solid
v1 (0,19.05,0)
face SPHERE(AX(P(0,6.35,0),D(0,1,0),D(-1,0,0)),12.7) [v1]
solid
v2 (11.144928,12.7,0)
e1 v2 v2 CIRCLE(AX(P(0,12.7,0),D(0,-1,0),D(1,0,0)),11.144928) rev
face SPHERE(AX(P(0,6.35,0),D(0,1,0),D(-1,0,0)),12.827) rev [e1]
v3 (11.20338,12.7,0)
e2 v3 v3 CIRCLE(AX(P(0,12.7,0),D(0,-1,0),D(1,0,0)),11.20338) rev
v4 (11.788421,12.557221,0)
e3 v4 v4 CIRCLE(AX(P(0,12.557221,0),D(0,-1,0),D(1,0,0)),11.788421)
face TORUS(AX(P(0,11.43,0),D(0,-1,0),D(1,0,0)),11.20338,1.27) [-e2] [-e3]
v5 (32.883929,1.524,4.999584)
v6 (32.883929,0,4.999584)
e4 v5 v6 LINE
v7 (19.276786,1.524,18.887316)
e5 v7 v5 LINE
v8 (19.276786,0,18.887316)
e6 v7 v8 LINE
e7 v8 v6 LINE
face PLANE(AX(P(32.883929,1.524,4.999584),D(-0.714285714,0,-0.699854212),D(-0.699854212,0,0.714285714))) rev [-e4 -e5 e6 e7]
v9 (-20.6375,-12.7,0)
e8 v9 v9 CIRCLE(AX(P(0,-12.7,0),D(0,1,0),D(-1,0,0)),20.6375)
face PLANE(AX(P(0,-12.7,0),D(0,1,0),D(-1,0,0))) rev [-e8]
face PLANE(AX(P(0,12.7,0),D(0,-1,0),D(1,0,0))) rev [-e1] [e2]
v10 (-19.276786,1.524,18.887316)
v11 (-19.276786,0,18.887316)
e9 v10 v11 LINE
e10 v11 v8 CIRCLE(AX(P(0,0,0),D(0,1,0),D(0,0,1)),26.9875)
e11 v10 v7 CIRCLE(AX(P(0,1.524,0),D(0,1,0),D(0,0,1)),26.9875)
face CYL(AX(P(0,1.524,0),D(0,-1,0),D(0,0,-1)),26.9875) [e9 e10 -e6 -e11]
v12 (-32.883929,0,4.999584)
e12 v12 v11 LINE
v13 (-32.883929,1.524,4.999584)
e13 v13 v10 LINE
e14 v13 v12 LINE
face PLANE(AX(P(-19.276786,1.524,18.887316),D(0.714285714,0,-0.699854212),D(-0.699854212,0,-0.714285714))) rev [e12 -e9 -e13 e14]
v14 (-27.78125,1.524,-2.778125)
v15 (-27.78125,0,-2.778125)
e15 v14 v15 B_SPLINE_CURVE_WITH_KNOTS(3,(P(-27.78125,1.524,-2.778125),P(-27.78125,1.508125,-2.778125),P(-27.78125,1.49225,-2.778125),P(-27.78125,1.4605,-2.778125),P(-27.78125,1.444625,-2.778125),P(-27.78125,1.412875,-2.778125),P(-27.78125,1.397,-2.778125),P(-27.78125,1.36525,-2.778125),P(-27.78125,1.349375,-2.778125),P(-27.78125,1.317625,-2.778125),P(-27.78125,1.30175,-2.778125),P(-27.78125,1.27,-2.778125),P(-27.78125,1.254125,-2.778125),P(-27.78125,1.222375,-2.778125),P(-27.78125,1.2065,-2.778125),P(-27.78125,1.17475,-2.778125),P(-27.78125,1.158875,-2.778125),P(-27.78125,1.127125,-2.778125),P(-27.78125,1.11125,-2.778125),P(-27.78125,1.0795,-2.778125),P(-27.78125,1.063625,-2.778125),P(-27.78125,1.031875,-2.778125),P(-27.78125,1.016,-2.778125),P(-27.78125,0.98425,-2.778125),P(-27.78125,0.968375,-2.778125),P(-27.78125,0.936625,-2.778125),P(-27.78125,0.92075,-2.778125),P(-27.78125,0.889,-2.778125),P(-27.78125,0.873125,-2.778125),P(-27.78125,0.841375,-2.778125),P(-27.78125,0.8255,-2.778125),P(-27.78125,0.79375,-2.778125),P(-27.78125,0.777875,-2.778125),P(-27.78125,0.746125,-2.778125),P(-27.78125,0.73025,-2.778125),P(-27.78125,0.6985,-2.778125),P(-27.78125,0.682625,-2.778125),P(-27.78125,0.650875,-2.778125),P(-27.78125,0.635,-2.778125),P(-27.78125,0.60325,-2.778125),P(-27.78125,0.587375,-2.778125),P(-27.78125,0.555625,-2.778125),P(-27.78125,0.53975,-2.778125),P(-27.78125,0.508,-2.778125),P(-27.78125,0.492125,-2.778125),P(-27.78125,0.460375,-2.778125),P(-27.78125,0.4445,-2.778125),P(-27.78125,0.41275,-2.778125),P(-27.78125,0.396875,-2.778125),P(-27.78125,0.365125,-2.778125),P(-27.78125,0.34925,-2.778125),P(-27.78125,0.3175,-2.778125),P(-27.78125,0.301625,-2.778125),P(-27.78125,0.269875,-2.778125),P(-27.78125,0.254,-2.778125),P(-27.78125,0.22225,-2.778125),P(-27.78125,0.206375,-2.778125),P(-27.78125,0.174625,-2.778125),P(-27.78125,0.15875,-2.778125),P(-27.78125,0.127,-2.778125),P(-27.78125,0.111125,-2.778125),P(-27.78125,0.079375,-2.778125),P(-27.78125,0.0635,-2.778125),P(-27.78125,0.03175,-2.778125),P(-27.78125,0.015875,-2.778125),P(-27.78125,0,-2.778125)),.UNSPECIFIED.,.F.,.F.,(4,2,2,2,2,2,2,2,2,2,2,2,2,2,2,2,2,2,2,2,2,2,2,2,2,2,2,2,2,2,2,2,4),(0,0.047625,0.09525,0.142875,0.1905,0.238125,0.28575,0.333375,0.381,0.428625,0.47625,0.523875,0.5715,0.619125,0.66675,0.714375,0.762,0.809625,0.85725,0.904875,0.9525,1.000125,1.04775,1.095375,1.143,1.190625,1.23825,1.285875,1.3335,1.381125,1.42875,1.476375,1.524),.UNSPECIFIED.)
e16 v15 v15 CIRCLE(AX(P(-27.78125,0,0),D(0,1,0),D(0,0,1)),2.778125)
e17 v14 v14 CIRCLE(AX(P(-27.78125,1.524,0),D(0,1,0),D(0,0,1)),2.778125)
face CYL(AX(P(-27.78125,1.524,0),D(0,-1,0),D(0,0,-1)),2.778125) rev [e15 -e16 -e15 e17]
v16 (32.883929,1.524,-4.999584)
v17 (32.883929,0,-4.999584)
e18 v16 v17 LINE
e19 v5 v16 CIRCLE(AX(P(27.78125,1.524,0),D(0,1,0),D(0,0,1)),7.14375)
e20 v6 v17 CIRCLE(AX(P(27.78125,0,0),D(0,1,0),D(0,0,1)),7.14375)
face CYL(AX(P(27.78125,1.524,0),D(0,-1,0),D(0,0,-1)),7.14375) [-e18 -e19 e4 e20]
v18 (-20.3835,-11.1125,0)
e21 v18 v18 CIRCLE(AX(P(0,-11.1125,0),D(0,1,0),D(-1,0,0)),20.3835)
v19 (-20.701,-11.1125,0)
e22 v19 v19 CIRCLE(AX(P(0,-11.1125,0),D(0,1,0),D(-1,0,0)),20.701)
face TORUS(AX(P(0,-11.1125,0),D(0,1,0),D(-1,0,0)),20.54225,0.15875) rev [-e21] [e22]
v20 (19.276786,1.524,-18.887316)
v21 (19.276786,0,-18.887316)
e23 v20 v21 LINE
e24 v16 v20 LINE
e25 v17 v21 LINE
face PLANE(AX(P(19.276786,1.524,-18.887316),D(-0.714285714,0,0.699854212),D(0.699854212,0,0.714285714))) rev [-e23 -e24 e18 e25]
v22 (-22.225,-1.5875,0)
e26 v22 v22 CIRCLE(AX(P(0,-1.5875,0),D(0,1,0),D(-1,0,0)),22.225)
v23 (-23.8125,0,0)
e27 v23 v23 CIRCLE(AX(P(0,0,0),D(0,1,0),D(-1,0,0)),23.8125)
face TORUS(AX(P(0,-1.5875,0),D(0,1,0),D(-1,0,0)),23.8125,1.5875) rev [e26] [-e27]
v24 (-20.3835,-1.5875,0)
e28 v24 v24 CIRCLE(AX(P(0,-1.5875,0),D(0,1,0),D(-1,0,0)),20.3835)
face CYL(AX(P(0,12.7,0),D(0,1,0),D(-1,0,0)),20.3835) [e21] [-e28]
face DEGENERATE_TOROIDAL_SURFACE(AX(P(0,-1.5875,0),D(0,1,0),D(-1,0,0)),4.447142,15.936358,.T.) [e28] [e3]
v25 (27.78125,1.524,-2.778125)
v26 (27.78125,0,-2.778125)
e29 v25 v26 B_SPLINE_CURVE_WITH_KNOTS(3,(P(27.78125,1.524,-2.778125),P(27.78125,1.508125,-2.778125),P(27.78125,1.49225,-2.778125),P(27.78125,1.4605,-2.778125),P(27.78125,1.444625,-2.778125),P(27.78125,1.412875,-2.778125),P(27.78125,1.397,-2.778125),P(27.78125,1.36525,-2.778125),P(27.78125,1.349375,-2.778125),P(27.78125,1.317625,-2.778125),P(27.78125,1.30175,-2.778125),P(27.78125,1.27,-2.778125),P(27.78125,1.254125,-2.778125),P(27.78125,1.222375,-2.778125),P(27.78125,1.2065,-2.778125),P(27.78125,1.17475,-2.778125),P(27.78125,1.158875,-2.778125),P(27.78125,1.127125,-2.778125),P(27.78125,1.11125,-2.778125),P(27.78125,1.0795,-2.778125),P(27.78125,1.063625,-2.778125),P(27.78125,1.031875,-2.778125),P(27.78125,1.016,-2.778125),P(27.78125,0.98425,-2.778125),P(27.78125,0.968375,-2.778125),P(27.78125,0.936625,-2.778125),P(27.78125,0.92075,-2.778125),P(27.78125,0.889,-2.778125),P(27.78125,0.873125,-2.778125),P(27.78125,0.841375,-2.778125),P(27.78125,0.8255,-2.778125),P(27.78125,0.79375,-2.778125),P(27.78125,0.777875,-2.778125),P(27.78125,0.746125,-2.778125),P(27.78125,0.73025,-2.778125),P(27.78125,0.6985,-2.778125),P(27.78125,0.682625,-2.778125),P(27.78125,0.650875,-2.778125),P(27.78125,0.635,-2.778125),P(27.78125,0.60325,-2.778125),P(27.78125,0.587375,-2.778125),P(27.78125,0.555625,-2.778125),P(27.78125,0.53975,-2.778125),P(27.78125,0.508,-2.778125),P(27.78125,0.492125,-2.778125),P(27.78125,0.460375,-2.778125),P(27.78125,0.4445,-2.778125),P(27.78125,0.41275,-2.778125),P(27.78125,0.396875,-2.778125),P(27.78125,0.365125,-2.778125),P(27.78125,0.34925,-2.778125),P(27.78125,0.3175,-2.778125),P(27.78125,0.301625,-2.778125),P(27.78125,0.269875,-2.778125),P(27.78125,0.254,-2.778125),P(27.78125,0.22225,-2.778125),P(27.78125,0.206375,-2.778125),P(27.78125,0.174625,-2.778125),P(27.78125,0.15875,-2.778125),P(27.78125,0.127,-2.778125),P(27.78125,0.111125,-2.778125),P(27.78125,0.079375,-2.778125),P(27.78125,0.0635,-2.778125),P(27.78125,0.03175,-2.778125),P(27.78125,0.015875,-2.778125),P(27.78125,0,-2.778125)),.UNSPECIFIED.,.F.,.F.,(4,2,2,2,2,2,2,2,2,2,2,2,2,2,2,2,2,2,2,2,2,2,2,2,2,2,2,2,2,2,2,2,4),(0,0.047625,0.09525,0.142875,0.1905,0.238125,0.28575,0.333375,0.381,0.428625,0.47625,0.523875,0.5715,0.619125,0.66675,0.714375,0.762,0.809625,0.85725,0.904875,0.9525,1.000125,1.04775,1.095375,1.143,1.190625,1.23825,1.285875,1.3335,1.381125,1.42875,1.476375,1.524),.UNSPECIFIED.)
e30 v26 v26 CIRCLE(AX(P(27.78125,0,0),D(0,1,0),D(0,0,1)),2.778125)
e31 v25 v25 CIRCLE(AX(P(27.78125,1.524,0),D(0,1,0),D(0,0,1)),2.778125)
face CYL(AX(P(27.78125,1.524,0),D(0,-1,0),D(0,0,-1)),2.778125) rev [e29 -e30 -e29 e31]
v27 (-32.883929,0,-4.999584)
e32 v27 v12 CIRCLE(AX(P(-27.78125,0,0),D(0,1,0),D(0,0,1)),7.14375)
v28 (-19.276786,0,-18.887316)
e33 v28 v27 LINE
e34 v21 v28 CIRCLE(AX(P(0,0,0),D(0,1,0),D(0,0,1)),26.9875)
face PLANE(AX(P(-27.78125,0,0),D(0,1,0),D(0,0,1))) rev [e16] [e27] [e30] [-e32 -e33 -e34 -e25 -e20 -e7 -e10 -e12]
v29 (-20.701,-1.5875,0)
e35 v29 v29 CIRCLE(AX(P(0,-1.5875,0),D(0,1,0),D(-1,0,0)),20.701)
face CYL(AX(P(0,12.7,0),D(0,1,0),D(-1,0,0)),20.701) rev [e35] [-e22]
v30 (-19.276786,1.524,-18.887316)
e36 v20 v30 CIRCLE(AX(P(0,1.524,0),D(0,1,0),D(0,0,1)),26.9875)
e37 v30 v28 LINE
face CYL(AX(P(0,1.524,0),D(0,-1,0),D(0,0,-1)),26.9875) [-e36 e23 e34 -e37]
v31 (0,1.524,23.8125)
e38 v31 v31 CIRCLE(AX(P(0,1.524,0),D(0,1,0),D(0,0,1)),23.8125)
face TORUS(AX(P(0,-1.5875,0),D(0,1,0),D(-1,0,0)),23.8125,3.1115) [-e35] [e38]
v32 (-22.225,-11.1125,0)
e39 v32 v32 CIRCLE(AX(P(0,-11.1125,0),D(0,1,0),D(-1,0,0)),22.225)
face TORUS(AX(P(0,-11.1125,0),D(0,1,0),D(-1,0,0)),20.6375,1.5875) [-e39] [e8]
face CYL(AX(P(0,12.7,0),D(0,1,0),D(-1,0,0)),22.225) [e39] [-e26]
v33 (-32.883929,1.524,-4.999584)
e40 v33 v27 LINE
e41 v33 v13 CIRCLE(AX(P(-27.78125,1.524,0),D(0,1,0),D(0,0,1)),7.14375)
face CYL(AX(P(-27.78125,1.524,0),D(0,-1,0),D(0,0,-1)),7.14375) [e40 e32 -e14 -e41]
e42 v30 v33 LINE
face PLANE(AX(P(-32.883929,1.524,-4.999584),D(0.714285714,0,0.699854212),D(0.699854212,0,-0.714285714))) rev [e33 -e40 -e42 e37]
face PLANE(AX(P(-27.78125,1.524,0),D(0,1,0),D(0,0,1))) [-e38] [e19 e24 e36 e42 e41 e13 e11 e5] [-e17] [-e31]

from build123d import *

# Parameters (mm, degrees)
SKETCH1_R           = 2.778125
BOSS_EXTRUDE1_DEPTH = 1.524
SKETCH3_R           = 23.8125
CUT_EXTRUDE1_DEPTH  = 47.372437474
FILLET1_R           = 1.27


# Read off the part's stored shape, not the designer's step: Move Face1
with BuildPart() as part:
    # Sketch1 → Boss-Extrude1 (new body)
    with BuildSketch(Plane(origin=(0, 0, 0), x_dir=(1, 0, 0), z_dir=(0, 1, 0))):
        with BuildLine():
            Line((-32.883928571, 4.999583529), (-19.276785714, 18.887315552))
            ThreePointArc((-19.276785714, 18.887315552), (0, 26.9875), (19.276785714, 18.887315552))
            Line((19.276785714, 18.887315552), (32.883928571, 4.999583529))
            ThreePointArc((32.883928571, 4.999583529), (34.925, 0), (32.883928571, -4.999583529))
            Line((32.883928571, -4.999583529), (19.276785714, -18.887315552))
            ThreePointArc((19.276785714, -18.887315552), (0, -26.9875), (-19.276785714, -18.887315552))
            Line((-19.276785714, -18.887315552), (-32.883928571, -4.999583529))
            ThreePointArc((-32.883928571, -4.999583529), (-34.925, 0), (-32.883928571, 4.999583529))
        make_face()
        with Locations(Location((-27.78125, 0, 0), (0, 0, 90))):
            Circle(SKETCH1_R, mode=Mode.SUBTRACT)
        with Locations(Location((27.78125, 0, 0), (0, 0, 90))):
            Circle(SKETCH1_R, mode=Mode.SUBTRACT)
    extrude(amount=BOSS_EXTRUDE1_DEPTH)

    # Sketch3 → Cut-Extrude1 (cut, through all)
    with BuildSketch(Plane(origin=(0, 1.524, 0), x_dir=(1, 0, 0), z_dir=(0, 1, 0))):
        with Locations(Location((0, 0, 0), (0, 0, 270))):
            Circle(SKETCH3_R)
    extrude(amount=-CUT_EXTRUDE1_DEPTH, mode=Mode.SUBTRACT)


with BuildPart() as body_2:
    # Sketch2 → Revolve1 (revolve)
    with BuildSketch(Plane.XY, mode=Mode.PRIVATE) as revolve1_sk:
        with BuildLine():
            Line((0, 12.7), (11.506522628, 12.7))
            ThreePointArc((11.506522628, 12.7), (17.983543358, 6.822811878), (20.3835, -1.5875))
            Line((20.3835, -1.5875), (20.3835, -11.1125))
            ThreePointArc((20.3835, -11.1125), (20.54225, -11.27125), (20.701, -11.1125))
            Line((20.701, -11.1125), (20.701, -1.5875))
            ThreePointArc((20.701, -1.5875), (21.61233725, 0.61266275), (23.8125, 1.524))
            Line((23.8125, 1.524), (23.8125, 0))
            ThreePointArc((23.8125, 0), (22.689967985, -0.464967985), (22.225, -1.5875))
            Line((22.225, -1.5875), (22.225, -11.1125))
            ThreePointArc((22.225, -11.1125), (21.760032015, -12.235032015), (20.6375, -12.7))
            Line((20.6375, -12.7), (0, -12.7))
            Line((0, -12.7), (0, 12.7))
        make_face()
    revolve(revolve1_sk.sketch.rotate(Axis((0, 12.7, 0), (0, -1, 0)), 180), axis=Axis((0, 12.7, 0), (0, -1, 0)))

    # Combine1: union part
    add(part.part)

    # Sketch4<2> → Cut-Revolve1 (revolve, cut)
    with BuildSketch(Plane.XY):
        with BuildLine():
            Line((0, 19.05), (0, -6.35))
            ThreePointArc((0, -6.35), (12.7, 6.35), (0, 19.05))
        make_face()
    revolve(axis=Axis((0, 19.05, 0), (0, -1, 0)), mode=Mode.SUBTRACT)

    # Move Face1 outline → Move Face1 (revolve, cut)
    with BuildSketch(Plane.XY):
        with BuildLine():
            Line((0, -6.35), (0, -6.477))
            ThreePointArc((0, -6.477), (11.090161837, -0.095171792), (11.144928392, 12.700000011))
            Line((11.144928392, 12.700000011), (10.998522622, 12.700000011))
            ThreePointArc((10.998522622, 12.700000011), (10.998522631, 5e-09), (0, -6.35))
        make_face()
    revolve(axis=Axis((0, 0, 0), (0, 1, 0)), mode=Mode.SUBTRACT)

    # Fillet1
    fillet1_edges = [body_2.edges().sort_by_distance(p)[0] for p in [
        (11.506522628, 12.7, 0),
    ]]
    fillet(fillet1_edges, radius=FILLET1_R)


with BuildPart() as body_2_2:
    # Sketch4 → Revolve2 (revolve)
    with BuildSketch(Plane.XY):
        with BuildLine():
            Line((0, 19.05), (0, -6.35))
            ThreePointArc((0, -6.35), (12.7, 6.35), (0, 19.05))
        make_face()
    revolve(axis=Axis((0, 19.05, 0), (0, -1, 0)))


solid = Compound([body_2.part, body_2_2.part])
